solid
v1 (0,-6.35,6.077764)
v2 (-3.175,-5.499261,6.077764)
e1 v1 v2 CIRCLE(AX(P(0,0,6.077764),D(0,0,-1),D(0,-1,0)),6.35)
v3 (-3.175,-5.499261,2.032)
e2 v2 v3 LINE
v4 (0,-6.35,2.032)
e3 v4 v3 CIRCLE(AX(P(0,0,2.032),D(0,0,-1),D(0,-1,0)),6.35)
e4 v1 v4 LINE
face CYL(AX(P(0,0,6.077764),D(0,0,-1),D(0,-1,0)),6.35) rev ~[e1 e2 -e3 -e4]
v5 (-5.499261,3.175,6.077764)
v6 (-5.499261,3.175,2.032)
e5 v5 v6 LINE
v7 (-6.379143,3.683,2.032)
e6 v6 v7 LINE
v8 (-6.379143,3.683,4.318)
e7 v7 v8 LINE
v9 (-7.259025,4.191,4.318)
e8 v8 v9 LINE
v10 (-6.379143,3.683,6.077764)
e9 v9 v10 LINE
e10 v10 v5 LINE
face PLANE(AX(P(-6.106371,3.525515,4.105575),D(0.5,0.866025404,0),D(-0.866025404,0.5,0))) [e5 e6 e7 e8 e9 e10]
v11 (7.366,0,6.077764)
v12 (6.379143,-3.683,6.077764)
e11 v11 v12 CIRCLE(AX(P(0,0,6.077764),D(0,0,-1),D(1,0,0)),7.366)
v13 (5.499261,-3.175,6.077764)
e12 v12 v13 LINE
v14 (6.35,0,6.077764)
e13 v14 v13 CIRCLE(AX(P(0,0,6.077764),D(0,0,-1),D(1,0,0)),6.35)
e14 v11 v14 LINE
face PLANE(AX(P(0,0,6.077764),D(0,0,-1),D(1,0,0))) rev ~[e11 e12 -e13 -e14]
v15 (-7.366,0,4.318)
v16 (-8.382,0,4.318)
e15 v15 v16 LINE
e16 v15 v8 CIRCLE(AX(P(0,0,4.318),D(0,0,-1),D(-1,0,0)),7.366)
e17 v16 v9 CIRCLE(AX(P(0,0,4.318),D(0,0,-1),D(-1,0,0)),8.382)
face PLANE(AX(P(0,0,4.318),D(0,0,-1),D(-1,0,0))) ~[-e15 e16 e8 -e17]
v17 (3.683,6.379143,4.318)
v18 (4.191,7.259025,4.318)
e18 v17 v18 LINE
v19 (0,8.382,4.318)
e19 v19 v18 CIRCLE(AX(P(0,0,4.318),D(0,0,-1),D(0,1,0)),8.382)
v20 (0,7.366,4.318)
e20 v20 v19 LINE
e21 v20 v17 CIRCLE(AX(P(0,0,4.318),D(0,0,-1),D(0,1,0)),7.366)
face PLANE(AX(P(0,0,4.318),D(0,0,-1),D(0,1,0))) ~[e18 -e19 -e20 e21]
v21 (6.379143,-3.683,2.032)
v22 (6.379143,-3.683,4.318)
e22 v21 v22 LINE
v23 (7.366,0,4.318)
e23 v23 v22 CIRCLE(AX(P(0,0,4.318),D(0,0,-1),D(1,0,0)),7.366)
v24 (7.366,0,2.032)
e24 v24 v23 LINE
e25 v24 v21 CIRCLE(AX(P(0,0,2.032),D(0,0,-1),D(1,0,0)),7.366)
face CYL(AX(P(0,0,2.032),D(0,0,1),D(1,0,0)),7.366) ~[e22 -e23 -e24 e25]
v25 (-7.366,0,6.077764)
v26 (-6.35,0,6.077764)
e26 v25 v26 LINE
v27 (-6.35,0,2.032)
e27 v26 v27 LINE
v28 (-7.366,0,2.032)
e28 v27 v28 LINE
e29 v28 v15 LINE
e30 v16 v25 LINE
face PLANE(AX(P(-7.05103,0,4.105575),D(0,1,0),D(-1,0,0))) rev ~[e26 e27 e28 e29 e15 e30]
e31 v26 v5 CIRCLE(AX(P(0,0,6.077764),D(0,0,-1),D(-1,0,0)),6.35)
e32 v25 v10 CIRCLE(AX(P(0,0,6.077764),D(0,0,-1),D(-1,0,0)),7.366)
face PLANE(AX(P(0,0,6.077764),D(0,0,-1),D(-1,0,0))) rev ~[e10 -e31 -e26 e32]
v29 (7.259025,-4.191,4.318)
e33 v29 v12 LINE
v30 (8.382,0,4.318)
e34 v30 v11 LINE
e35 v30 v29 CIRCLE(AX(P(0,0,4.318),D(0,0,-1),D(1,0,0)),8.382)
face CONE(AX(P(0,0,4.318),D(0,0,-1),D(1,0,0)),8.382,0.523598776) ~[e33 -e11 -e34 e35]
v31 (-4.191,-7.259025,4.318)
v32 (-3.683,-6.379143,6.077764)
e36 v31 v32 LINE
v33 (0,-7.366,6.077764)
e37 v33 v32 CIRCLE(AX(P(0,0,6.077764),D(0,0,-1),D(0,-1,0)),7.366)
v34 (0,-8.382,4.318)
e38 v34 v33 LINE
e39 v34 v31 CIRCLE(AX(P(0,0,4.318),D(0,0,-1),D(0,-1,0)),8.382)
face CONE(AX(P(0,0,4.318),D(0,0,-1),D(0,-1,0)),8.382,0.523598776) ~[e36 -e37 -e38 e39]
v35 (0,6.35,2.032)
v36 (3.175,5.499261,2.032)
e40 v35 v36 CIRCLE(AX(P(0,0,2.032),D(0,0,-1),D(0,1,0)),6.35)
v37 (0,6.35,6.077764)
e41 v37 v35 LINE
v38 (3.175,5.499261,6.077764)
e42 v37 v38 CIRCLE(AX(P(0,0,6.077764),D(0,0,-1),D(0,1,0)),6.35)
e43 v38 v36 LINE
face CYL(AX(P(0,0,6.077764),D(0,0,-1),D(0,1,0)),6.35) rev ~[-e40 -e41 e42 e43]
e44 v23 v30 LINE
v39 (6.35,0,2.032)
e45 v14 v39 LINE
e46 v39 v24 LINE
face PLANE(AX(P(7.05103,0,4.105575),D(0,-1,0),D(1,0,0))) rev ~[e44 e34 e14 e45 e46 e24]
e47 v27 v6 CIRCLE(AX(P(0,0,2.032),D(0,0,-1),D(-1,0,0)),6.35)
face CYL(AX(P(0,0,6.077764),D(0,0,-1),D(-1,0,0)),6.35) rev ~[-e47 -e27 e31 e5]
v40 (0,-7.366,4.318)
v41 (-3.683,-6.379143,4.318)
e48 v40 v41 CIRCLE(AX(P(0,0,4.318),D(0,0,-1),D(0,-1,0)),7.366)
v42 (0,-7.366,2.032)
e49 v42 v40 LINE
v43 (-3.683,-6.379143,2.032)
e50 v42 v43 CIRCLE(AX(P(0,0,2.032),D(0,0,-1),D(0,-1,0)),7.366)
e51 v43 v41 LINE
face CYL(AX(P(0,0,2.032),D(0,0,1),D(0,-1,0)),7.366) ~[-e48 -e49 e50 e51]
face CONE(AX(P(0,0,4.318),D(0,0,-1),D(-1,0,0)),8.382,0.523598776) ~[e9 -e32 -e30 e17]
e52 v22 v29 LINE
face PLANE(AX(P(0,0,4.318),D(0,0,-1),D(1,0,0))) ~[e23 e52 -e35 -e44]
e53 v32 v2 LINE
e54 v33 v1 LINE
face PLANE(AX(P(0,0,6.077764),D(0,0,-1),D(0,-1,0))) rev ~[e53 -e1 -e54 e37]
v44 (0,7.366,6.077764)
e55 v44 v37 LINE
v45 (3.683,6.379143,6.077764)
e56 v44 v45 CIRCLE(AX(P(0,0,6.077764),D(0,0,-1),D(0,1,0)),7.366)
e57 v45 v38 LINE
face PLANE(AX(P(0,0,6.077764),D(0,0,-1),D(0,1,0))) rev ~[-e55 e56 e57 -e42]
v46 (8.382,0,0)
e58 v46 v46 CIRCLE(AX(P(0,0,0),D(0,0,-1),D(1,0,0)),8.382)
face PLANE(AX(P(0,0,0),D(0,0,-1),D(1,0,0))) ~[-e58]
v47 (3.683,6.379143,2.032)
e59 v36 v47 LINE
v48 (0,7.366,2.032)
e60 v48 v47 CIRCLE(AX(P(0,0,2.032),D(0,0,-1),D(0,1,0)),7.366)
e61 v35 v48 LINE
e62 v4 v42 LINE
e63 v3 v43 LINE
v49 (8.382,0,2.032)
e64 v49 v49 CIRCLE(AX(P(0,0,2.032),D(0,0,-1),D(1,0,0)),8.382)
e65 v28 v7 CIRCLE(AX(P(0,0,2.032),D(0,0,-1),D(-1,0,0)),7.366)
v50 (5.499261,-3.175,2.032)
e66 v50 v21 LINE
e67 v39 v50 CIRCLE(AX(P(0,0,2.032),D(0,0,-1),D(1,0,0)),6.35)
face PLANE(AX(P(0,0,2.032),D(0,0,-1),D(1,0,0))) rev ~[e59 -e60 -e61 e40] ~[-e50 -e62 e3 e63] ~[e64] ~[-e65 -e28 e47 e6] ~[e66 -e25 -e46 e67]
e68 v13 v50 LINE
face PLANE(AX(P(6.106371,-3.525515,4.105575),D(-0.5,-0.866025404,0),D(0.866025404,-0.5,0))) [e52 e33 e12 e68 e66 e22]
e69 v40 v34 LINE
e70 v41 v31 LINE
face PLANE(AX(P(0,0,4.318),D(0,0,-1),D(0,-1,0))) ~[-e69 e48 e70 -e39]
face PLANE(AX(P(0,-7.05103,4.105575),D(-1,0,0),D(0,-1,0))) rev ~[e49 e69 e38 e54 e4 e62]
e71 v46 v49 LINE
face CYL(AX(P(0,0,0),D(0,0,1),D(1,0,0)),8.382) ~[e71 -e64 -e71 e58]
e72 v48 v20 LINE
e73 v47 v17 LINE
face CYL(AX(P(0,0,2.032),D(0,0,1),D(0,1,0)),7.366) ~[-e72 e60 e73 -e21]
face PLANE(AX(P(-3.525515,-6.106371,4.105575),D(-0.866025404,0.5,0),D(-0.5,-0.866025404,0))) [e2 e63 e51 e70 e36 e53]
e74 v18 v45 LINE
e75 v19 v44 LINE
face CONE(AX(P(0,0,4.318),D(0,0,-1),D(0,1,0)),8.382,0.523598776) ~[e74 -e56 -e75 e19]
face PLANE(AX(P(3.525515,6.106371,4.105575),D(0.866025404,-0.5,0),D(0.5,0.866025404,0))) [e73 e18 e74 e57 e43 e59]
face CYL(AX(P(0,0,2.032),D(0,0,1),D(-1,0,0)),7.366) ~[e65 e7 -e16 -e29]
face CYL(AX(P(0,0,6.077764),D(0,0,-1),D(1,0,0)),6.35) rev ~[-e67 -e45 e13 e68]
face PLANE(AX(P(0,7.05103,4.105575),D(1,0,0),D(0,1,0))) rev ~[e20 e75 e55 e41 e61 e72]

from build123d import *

# Parameters (mm, degrees)
F1_ANGLE = 30
F2_COUNT = 4


with BuildPart() as f1:
    # F0 (on Front) → F1 (revolve)
    with BuildSketch(Plane.XZ):
        Polygon((7.366, 2.032), (7.366, 4.318), (8.382, 4.318), (7.366, 6.0777636205), (6.35, 6.0777636205), (6.35, 2.032), align=None)
    revolve(axis=Axis((0, 0, 1.016), (0, 0, -1)), revolution_arc=F1_ANGLE)


with BuildPart() as f2_1:
    # F2: instance of F1
    add(f1.part.rotate(Axis((0, 0, 1.016), (0, 0, -1)), 1 * 360 / F2_COUNT))


with BuildPart() as f2_2:
    # F2: instance of F1
    add(f1.part.rotate(Axis((0, 0, 1.016), (0, 0, -1)), 2 * 360 / F2_COUNT))


with BuildPart() as f2_3:
    # F2: instance of F1
    add(f1.part.rotate(Axis((0, 0, 1.016), (0, 0, -1)), 3 * 360 / F2_COUNT))


with BuildPart() as f1_1:
    add(f1.part)

    add(f2_1.part)  # F3 merges F2_1

    add(f2_2.part)  # F3 merges F2_2

    add(f2_3.part)  # F3 merges F2_3
    # F0 (on Front) → F3 (revolve)
    with BuildSketch(Plane.XZ):
        Polygon((8.382, 2.032), (7.366, 2.032), (6.35, 2.032), (0, 2.032), (0, 0), (8.382, 0), align=None)
    revolve(axis=Axis((0, 0, 1.016), (0, 0, -1)))


solid = f1_1.part
